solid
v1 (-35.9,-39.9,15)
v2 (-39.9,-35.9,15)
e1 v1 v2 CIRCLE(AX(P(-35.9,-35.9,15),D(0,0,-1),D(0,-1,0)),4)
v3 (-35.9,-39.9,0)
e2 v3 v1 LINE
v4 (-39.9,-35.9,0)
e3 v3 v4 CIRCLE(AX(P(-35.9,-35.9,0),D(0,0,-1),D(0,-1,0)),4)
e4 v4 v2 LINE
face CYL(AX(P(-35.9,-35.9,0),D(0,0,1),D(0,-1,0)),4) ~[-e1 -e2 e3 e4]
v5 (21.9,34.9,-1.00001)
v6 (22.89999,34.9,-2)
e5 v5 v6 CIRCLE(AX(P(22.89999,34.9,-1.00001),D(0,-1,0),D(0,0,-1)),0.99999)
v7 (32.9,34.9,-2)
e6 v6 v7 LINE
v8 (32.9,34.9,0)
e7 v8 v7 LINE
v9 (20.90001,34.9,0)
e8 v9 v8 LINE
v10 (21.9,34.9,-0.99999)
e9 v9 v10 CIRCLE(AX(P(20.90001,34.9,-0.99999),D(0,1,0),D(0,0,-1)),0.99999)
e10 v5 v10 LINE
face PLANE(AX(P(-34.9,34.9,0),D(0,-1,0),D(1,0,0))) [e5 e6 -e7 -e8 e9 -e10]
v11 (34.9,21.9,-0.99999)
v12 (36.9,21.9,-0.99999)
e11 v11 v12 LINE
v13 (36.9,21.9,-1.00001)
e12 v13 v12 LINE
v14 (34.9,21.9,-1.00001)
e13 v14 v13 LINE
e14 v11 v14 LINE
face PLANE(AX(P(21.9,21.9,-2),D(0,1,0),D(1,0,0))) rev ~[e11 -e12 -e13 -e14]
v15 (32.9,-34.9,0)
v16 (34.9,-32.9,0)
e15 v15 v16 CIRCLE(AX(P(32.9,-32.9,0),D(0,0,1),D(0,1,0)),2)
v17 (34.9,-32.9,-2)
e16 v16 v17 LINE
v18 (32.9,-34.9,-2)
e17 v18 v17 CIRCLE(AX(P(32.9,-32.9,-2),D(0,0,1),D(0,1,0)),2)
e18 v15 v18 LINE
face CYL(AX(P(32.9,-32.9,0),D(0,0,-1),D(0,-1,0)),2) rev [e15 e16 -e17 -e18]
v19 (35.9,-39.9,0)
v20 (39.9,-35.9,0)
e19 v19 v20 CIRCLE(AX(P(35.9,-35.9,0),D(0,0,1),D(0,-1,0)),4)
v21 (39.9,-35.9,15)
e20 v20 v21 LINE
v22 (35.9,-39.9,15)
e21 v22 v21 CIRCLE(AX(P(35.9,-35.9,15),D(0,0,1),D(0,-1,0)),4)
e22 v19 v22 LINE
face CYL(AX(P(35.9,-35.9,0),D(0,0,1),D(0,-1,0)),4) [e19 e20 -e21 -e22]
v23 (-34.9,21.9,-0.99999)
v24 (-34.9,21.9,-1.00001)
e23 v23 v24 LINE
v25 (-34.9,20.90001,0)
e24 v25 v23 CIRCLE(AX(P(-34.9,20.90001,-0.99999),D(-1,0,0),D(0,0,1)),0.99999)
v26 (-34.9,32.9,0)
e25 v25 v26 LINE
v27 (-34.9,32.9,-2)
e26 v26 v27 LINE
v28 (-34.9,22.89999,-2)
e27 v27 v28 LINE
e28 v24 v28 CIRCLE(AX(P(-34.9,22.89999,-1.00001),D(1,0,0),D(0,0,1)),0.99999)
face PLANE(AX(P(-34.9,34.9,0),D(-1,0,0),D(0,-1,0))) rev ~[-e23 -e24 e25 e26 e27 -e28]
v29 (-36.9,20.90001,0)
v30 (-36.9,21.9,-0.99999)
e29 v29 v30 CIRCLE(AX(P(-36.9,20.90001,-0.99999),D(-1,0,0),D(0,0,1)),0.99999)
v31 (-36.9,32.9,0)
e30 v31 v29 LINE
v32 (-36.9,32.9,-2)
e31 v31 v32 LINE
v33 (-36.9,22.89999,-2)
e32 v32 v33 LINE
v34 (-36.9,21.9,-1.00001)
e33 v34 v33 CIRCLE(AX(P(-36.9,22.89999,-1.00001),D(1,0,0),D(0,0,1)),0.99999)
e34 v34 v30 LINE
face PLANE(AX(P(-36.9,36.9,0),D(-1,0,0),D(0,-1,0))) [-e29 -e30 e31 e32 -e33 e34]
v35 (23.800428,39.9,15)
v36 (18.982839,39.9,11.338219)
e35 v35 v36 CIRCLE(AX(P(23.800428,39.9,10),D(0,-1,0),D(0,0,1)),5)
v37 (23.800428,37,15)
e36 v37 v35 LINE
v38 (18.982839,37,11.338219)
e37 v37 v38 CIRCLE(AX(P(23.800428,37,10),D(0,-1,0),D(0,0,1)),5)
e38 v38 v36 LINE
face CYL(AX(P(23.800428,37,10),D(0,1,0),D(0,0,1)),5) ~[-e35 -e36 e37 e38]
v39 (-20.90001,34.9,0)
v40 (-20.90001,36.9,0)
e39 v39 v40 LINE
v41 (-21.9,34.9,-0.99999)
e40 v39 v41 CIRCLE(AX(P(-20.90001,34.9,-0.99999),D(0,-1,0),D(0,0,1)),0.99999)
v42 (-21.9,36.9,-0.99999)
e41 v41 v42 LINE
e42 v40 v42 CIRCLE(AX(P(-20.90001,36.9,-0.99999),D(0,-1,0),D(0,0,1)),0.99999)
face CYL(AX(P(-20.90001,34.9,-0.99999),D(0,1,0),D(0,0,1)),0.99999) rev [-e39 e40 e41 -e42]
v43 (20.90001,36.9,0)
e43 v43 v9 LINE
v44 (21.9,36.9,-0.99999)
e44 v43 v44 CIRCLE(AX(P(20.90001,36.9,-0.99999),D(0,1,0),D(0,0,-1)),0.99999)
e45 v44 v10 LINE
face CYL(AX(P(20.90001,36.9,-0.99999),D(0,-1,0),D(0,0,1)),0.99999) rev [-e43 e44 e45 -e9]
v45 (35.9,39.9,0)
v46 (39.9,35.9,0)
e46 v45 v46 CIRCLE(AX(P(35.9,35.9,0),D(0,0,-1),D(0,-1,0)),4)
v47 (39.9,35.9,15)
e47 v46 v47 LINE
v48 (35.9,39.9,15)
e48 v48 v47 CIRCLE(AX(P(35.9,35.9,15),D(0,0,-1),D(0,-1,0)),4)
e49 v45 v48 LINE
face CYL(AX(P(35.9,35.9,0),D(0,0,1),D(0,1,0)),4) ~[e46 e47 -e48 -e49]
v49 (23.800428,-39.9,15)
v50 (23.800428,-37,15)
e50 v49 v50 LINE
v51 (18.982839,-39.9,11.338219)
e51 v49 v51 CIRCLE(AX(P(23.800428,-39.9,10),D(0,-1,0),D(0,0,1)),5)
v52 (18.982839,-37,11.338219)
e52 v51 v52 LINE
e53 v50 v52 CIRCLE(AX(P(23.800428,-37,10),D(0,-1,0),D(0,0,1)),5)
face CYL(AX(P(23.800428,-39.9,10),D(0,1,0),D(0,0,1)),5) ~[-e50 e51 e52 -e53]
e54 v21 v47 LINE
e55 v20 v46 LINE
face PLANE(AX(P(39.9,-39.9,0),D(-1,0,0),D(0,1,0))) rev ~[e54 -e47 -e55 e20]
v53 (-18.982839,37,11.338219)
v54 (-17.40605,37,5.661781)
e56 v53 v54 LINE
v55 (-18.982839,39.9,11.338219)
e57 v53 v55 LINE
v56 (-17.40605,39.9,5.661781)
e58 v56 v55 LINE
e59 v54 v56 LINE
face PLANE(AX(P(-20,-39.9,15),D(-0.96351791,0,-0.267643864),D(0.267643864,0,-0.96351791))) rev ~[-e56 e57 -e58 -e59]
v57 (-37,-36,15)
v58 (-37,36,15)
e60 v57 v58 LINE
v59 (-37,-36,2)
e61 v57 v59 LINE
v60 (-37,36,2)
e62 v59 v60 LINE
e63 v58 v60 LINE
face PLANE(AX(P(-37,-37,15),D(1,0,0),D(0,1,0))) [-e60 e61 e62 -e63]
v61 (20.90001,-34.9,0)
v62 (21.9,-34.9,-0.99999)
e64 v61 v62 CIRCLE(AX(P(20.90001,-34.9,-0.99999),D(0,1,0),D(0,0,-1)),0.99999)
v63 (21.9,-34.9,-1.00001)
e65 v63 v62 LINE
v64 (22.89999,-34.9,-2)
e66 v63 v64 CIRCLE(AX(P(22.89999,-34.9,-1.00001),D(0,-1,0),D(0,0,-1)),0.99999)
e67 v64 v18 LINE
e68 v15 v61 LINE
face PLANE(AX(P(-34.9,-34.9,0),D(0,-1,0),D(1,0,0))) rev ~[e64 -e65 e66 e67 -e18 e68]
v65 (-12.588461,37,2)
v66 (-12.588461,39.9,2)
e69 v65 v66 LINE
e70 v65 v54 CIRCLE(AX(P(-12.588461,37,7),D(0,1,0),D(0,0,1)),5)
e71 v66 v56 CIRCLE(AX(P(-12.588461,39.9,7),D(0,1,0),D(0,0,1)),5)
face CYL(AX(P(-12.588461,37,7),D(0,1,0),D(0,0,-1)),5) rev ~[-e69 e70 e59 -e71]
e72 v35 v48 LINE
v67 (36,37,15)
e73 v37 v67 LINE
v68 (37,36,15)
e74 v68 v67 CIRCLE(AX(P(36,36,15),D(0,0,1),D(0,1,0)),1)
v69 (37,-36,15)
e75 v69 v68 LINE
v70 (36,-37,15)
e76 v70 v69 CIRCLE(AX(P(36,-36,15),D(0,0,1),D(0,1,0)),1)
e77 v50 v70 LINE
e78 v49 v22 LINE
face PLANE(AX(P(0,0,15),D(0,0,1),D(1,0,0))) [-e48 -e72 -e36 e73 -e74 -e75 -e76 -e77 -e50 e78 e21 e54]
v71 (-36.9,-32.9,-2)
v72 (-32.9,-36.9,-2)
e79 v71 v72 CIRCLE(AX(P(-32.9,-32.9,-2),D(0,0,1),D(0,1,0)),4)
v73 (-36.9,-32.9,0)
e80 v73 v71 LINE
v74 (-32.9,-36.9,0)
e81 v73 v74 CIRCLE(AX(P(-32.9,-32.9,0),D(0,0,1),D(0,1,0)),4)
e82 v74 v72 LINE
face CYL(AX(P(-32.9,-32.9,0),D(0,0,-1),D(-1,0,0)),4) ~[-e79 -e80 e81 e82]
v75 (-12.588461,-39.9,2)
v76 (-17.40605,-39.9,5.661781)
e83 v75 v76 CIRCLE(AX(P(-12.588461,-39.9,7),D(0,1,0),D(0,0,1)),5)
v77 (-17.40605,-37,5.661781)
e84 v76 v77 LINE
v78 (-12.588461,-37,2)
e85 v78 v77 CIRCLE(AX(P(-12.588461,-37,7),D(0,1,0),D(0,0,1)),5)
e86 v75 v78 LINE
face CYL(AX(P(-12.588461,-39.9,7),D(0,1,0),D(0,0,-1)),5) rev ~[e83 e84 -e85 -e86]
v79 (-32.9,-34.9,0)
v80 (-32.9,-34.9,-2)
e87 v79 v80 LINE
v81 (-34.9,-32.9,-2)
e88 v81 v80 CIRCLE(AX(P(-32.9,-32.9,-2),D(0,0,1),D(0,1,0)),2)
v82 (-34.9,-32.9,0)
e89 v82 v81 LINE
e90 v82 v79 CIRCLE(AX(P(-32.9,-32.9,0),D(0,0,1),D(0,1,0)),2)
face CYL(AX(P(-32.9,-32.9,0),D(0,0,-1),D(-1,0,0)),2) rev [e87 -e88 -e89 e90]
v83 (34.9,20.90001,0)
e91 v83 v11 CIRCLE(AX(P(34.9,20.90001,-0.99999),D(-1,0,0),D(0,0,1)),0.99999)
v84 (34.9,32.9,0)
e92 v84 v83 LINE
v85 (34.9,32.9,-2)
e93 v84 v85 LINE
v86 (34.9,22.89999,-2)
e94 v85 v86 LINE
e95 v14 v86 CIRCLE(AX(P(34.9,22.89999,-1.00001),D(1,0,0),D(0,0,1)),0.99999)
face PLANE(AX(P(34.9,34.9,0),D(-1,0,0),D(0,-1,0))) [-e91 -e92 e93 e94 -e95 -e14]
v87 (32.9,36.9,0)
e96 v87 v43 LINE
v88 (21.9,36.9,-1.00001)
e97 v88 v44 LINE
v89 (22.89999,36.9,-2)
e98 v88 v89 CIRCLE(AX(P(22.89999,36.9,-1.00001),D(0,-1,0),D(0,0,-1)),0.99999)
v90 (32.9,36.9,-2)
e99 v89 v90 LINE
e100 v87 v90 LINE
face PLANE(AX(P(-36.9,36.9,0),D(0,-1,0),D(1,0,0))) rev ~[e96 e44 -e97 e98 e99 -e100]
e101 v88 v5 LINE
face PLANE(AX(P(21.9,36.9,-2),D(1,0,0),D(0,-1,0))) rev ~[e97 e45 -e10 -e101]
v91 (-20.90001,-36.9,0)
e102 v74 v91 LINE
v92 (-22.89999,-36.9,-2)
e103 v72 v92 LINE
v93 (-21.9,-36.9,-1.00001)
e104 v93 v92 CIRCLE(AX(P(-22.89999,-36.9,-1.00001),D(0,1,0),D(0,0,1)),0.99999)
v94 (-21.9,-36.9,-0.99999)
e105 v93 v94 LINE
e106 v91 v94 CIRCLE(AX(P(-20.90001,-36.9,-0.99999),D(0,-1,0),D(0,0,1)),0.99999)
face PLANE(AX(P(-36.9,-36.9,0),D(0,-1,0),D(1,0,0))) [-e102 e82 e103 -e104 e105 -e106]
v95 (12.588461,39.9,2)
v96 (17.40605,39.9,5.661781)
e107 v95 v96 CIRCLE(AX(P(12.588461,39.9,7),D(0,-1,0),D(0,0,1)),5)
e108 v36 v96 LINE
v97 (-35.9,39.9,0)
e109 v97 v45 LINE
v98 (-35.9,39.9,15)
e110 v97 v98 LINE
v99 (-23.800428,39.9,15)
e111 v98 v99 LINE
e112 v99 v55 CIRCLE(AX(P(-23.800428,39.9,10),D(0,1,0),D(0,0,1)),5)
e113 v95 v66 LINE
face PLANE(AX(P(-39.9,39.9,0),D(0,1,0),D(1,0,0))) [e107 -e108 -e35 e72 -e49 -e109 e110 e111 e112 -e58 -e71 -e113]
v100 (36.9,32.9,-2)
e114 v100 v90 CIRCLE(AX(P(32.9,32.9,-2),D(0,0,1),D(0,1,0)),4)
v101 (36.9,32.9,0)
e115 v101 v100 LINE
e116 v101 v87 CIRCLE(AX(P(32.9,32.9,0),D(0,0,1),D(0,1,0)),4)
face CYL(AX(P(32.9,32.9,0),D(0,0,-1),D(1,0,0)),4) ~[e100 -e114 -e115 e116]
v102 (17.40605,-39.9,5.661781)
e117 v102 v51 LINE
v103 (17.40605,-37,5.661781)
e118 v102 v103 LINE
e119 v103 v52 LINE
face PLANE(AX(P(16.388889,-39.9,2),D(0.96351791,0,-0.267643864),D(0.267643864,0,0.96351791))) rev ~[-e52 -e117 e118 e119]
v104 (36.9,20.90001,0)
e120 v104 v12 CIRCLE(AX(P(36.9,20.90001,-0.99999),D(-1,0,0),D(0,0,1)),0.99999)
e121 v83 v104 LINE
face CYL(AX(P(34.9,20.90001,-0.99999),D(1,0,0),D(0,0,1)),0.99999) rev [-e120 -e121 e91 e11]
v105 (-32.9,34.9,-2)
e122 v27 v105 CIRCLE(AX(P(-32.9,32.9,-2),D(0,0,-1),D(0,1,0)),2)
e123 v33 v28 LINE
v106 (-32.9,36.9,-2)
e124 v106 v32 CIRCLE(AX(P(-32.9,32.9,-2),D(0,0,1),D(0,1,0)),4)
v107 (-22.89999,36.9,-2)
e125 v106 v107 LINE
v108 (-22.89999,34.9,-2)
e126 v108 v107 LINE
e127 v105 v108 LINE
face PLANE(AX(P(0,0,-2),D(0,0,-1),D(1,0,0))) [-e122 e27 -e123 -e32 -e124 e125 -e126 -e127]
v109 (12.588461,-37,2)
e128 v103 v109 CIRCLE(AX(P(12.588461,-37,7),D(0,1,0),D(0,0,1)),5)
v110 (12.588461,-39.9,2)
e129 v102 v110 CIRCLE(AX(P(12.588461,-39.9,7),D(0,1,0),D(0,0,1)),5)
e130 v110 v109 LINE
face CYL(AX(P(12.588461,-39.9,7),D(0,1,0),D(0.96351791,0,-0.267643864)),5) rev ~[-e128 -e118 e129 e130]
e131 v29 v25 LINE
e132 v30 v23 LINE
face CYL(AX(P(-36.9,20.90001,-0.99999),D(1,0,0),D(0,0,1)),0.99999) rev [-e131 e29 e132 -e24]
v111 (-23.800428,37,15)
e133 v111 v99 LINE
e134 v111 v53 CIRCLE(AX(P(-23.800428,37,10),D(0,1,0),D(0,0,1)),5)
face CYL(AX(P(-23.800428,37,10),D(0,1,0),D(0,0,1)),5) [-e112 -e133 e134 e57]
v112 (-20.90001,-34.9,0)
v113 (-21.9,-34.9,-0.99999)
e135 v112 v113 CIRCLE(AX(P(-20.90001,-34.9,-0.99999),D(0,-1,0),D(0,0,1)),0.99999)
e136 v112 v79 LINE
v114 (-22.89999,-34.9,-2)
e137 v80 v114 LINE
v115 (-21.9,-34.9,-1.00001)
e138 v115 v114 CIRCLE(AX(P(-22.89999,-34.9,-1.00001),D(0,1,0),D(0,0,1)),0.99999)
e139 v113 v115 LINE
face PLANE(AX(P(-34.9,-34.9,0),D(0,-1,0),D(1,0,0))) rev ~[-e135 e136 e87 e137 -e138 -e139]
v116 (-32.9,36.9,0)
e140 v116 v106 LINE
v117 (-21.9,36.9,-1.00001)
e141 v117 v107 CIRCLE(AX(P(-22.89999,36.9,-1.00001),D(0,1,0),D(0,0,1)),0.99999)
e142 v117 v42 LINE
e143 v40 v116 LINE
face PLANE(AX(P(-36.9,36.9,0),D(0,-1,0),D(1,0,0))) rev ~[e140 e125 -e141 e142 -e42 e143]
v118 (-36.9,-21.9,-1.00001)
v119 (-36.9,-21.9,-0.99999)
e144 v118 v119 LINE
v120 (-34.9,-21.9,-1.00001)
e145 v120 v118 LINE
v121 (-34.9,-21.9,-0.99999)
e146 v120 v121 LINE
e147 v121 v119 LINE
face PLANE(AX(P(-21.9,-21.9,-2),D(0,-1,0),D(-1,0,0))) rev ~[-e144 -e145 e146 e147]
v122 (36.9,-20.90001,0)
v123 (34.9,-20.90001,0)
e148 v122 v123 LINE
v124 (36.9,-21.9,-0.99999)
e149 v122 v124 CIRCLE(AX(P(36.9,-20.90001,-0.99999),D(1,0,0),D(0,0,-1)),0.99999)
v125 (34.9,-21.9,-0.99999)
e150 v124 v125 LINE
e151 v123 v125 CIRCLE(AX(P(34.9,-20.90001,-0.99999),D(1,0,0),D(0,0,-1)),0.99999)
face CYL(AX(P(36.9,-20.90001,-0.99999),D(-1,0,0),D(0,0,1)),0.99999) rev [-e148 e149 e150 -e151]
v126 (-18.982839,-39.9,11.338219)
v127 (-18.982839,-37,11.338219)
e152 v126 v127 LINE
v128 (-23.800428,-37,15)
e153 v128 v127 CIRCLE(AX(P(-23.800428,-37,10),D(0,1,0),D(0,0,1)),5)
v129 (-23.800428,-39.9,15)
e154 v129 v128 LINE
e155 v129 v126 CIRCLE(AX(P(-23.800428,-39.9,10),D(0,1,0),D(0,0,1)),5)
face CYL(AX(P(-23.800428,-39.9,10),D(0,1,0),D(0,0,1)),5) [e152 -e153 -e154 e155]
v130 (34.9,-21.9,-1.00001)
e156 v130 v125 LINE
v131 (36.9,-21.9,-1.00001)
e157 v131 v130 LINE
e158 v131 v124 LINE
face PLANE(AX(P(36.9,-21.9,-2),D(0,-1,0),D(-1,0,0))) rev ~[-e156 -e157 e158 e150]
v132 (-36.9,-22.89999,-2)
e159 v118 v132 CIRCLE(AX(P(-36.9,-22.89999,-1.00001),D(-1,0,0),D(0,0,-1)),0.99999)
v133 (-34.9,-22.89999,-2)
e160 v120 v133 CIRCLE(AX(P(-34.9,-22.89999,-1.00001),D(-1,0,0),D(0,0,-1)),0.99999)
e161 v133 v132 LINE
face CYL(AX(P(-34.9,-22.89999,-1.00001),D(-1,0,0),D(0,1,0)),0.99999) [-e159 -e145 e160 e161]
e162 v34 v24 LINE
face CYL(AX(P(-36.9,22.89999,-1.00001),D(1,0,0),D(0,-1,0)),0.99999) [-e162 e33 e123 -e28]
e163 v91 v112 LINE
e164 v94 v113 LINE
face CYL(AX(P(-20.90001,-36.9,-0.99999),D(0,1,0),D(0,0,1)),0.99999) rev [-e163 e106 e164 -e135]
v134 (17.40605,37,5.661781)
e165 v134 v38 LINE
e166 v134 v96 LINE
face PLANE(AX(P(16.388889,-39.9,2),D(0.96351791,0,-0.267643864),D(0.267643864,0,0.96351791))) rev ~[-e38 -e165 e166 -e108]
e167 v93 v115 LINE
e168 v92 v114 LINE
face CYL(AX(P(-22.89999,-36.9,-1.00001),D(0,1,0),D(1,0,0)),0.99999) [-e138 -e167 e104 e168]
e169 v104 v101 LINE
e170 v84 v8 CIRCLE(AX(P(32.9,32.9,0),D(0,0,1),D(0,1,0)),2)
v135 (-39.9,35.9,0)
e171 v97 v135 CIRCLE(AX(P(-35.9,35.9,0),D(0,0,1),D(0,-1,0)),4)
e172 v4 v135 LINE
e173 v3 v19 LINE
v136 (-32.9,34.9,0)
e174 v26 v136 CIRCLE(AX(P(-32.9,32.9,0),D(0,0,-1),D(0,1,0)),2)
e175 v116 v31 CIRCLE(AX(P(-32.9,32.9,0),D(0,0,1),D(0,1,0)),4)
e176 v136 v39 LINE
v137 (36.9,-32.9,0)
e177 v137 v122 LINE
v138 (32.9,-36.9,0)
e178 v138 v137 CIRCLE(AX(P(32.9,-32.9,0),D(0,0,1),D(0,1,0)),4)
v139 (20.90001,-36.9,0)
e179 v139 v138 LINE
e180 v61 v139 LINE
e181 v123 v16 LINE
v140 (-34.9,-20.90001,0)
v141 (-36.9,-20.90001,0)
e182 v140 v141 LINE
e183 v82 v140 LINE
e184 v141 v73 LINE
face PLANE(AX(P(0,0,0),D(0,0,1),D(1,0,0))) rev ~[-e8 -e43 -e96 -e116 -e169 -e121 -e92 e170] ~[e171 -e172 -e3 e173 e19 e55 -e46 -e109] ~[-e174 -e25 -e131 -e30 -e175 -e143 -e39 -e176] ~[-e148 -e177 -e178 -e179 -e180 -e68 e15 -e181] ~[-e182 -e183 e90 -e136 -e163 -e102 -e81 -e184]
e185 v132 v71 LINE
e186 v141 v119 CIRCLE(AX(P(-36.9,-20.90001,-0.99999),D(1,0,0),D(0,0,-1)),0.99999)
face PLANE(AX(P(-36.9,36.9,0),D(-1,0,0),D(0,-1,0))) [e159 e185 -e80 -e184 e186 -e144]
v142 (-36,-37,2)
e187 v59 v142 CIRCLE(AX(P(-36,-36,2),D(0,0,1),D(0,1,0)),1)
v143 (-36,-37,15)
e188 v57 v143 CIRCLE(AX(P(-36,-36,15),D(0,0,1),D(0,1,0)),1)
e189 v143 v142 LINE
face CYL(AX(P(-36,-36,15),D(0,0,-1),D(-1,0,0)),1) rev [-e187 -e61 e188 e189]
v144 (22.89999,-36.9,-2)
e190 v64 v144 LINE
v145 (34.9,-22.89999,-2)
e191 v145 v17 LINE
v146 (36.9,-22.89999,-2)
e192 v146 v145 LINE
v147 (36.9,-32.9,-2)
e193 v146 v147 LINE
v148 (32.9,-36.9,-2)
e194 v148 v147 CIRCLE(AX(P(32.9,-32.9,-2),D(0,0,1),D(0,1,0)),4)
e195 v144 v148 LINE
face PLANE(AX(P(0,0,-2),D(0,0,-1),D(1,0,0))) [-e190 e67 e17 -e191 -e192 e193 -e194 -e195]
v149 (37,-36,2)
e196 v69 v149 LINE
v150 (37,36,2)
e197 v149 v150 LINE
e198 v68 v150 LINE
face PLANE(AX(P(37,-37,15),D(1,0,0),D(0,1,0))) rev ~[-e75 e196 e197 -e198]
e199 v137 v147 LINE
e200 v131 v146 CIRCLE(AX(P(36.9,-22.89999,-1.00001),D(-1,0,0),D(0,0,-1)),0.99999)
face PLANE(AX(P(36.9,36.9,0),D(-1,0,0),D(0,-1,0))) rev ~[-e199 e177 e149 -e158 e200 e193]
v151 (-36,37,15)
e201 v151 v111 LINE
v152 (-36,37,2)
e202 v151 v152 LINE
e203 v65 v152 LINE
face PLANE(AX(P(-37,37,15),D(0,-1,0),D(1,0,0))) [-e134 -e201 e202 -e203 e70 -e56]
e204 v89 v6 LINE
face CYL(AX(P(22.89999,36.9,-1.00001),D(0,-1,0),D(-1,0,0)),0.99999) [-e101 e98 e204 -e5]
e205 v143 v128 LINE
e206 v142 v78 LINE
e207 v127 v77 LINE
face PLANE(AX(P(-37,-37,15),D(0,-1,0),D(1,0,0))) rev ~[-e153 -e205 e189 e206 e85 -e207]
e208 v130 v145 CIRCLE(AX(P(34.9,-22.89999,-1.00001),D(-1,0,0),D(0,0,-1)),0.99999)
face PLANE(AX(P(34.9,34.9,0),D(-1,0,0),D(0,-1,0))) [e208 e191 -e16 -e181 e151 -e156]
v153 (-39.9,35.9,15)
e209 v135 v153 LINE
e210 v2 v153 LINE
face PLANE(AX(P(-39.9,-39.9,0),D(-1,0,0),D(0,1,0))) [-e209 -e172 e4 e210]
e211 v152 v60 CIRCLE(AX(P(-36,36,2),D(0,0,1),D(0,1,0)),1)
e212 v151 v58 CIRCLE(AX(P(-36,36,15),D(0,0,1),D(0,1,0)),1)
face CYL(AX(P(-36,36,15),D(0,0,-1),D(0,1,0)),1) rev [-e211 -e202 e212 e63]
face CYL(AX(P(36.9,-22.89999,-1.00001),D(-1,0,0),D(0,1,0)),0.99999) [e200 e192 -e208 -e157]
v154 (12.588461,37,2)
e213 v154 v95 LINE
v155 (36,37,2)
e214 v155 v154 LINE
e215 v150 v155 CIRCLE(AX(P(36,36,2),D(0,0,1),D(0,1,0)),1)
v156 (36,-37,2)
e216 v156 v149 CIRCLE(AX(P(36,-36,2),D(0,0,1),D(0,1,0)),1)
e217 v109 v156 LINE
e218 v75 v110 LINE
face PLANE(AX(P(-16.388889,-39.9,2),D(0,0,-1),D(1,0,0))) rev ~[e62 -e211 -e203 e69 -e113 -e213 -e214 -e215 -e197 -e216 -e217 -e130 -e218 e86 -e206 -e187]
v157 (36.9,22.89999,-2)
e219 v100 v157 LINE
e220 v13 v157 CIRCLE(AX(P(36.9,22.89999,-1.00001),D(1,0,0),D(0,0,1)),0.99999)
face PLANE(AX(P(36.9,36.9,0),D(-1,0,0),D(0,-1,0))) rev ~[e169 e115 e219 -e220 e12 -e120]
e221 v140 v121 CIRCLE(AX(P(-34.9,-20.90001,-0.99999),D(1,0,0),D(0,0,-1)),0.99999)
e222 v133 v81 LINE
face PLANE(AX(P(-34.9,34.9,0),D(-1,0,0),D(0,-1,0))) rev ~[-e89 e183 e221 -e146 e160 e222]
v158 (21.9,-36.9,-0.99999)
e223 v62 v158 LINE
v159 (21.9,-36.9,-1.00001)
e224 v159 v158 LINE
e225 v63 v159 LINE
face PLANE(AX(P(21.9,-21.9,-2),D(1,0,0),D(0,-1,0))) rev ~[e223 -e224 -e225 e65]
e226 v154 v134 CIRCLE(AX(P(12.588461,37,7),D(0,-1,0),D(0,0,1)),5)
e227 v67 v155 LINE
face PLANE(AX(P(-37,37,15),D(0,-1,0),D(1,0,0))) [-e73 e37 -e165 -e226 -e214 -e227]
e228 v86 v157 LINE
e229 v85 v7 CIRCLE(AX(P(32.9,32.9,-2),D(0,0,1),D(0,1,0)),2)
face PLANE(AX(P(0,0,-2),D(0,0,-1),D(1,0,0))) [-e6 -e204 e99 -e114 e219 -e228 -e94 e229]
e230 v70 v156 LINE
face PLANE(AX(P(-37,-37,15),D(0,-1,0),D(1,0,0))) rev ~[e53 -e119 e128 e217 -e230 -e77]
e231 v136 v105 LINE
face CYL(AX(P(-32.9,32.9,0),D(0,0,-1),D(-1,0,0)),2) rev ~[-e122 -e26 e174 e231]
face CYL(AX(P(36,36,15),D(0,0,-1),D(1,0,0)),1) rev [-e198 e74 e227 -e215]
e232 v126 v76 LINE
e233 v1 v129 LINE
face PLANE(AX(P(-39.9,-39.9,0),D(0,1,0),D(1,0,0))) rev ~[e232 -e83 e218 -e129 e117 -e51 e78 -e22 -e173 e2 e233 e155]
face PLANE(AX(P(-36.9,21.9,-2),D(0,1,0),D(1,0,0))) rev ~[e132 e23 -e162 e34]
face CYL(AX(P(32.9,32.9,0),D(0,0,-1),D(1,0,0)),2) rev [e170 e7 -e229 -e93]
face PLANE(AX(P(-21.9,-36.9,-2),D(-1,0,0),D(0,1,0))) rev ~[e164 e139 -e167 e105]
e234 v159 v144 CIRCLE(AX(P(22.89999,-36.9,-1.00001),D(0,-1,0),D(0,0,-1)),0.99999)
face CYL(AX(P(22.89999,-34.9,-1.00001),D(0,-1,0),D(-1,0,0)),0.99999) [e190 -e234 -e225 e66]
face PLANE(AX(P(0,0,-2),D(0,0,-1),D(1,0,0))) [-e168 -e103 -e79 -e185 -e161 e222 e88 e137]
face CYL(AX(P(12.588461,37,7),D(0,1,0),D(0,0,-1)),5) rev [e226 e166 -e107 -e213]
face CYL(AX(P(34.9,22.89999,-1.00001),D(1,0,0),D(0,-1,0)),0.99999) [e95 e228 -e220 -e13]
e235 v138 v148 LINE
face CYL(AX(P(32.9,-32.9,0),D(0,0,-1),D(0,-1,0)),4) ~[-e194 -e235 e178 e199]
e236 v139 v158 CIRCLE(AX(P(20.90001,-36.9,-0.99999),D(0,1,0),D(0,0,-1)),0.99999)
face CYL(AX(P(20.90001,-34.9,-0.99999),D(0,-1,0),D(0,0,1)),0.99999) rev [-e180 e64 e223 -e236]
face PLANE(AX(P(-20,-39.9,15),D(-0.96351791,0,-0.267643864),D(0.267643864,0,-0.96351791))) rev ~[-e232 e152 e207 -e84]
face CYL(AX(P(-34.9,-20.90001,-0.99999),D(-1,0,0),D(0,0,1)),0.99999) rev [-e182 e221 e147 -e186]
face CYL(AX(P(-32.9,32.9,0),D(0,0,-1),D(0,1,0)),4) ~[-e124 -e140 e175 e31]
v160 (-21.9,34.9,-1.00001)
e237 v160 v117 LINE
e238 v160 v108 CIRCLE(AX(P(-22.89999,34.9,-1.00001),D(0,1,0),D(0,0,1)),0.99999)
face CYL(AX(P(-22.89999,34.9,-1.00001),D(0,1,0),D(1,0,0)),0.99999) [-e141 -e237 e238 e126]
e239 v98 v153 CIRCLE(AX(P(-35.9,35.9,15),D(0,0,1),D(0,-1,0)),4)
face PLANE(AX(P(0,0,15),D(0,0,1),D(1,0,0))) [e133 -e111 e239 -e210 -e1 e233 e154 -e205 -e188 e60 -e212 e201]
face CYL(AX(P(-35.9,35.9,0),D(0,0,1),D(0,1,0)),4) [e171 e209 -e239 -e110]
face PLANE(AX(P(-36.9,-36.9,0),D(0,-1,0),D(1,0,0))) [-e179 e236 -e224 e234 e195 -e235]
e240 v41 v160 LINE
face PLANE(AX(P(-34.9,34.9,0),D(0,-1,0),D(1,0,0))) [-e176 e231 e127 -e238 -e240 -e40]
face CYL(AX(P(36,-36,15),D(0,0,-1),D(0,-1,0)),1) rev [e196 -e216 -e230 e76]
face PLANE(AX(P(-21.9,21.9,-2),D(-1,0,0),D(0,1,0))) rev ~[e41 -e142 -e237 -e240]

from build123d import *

# Parameters (mm, degrees)
F0_W      = 79.8
F0_H      = 79.8
F1_DEPTH  = 15
F2_W      = 74
F2_H      = 74
F3_DEPTH  = 13
F4_W      = 73.8
F4_H      = 73.8
F4_W_2    = 69.8
F4_H_2    = 69.8
F5_DEPTH  = 2
F7_DEPTH  = 2
F8_R      = 2
F9_R      = 4
F10_R     = 0.99999
F12_DEPTH = 79.801
F13_R     = 5
F14_R     = 4
F15_R     = 1


# Not quite as in the source:
# - a fillet or chamfer is up to 0.001 mm smaller than in the source, because OpenCascade refuses the exact size


with BuildPart() as f1:
    # F0 (on Top) → F1 (new body)
    with BuildSketch(Plane.XY):
        Rectangle(F0_W, F0_H)
    extrude(amount=F1_DEPTH)

    # F2 (on face) → F3 (cut)
    with BuildSketch(Plane.XY.offset(15)):
        Rectangle(F2_W, F2_H)
    extrude(amount=-F3_DEPTH, mode=Mode.SUBTRACT)

    # F4 (on face) → F5 (join)
    with BuildSketch(Plane(origin=(0, 0, 0), x_dir=(1, 0, 0), z_dir=(0, 0, -1))):
        Rectangle(F4_W, F4_H)
        Rectangle(F4_W_2, F4_H_2, mode=Mode.SUBTRACT)
    extrude(amount=F5_DEPTH)

    # F6 (on face) → F7 (cut, through all)
    with BuildSketch(Plane(origin=(0, 0, -2), x_dir=(1, 0, 0), z_dir=(0, 0, -1))):
        Polygon((36.9, -21.9), (36.9, 21.9), (21.9, 21.9), (21.9, 36.9), (-21.9, 36.9), (-21.9, 21.9), (-36.9, 21.9), (-36.9, -21.9), (-21.9, -21.9), (-21.9, -36.9), (21.9, -36.9), (21.9, -21.9), align=None)
    extrude(amount=-F7_DEPTH, mode=Mode.SUBTRACT)

    # F8
    f8_edges = [f1.edges().sort_by_distance(p)[0] for p in [
        (-34.9, 34.9, -1),
        (-34.9, -34.9, -1),
        (34.9, -34.9, -1),
        (34.9, 34.9, -1),
    ]]
    fillet(f8_edges, radius=F8_R)

    # F9
    f9_edges = [f1.edges().sort_by_distance(p)[0] for p in [
        (-36.9, 36.9, -1),
        (36.9, 36.9, -1),
        (36.9, -36.9, -1),
        (-36.9, -36.9, -1),
    ]]
    fillet(f9_edges, radius=F9_R)

    # F10 (radius 1 in the source; OpenCascade refuses exactly that, so slightly less here)
    f10_edges = [f1.edges().sort_by_distance(p)[0] for p in [
        (21.9, -35.9, -2),
        (21.9, -35.9, 0),
        (35.9, -21.9, -2),
        (35.9, -21.9, 0),
        (-35.9, -21.9, -2),
        (-35.9, -21.9, 0),
        (-21.9, -35.9, -2),
        (-21.9, -35.9, 0),
        (-35.9, 21.9, -2),
        (-35.9, 21.9, 0),
        (-21.9, 35.9, -2),
        (-21.9, 35.9, 0),
        (21.9, 35.9, -2),
        (21.9, 35.9, 0),
        (35.9, 21.9, -2),
        (35.9, 21.9, 0),
    ]]
    fillet(f10_edges, radius=F10_R)

    # F11 (on face) → F12 (cut, through all)
    with BuildSketch(Plane.XZ.offset(39.9)):
        Polygon((20, 15), (-20, 15), (-16.3888888889, 2), (16.3888888889, 2), align=None)
    extrude(amount=-F12_DEPTH, mode=Mode.SUBTRACT)

    # F13
    f13_edges = [f1.edges().sort_by_distance(p)[0] for p in [
        (-20, -38.45, 15),
        (-16.388889, -38.45, 2),
        (16.388889, -38.45, 2),
        (20, -38.45, 15),
        (16.388889, 38.45, 2),
        (20, 38.45, 15),
        (-20, 38.45, 15),
        (-16.388889, 38.45, 2),
    ]]
    fillet(f13_edges, radius=F13_R)

    # F14
    f14_edges = [f1.edges().sort_by_distance(p)[0] for p in [
        (39.9, -39.9, 7.5),
        (39.9, 39.9, 7.5),
        (-39.9, -39.9, 7.5),
        (-39.9, 39.9, 7.5),
    ]]
    fillet(f14_edges, radius=F14_R)

    # F15
    f15_edges = [f1.edges().sort_by_distance(p)[0] for p in [
        (37, 37, 8.5),
        (-37, 37, 8.5),
        (-37, -37, 8.5),
        (37, -37, 8.5),
    ]]
    fillet(f15_edges, radius=F15_R)


solid = f1.part
